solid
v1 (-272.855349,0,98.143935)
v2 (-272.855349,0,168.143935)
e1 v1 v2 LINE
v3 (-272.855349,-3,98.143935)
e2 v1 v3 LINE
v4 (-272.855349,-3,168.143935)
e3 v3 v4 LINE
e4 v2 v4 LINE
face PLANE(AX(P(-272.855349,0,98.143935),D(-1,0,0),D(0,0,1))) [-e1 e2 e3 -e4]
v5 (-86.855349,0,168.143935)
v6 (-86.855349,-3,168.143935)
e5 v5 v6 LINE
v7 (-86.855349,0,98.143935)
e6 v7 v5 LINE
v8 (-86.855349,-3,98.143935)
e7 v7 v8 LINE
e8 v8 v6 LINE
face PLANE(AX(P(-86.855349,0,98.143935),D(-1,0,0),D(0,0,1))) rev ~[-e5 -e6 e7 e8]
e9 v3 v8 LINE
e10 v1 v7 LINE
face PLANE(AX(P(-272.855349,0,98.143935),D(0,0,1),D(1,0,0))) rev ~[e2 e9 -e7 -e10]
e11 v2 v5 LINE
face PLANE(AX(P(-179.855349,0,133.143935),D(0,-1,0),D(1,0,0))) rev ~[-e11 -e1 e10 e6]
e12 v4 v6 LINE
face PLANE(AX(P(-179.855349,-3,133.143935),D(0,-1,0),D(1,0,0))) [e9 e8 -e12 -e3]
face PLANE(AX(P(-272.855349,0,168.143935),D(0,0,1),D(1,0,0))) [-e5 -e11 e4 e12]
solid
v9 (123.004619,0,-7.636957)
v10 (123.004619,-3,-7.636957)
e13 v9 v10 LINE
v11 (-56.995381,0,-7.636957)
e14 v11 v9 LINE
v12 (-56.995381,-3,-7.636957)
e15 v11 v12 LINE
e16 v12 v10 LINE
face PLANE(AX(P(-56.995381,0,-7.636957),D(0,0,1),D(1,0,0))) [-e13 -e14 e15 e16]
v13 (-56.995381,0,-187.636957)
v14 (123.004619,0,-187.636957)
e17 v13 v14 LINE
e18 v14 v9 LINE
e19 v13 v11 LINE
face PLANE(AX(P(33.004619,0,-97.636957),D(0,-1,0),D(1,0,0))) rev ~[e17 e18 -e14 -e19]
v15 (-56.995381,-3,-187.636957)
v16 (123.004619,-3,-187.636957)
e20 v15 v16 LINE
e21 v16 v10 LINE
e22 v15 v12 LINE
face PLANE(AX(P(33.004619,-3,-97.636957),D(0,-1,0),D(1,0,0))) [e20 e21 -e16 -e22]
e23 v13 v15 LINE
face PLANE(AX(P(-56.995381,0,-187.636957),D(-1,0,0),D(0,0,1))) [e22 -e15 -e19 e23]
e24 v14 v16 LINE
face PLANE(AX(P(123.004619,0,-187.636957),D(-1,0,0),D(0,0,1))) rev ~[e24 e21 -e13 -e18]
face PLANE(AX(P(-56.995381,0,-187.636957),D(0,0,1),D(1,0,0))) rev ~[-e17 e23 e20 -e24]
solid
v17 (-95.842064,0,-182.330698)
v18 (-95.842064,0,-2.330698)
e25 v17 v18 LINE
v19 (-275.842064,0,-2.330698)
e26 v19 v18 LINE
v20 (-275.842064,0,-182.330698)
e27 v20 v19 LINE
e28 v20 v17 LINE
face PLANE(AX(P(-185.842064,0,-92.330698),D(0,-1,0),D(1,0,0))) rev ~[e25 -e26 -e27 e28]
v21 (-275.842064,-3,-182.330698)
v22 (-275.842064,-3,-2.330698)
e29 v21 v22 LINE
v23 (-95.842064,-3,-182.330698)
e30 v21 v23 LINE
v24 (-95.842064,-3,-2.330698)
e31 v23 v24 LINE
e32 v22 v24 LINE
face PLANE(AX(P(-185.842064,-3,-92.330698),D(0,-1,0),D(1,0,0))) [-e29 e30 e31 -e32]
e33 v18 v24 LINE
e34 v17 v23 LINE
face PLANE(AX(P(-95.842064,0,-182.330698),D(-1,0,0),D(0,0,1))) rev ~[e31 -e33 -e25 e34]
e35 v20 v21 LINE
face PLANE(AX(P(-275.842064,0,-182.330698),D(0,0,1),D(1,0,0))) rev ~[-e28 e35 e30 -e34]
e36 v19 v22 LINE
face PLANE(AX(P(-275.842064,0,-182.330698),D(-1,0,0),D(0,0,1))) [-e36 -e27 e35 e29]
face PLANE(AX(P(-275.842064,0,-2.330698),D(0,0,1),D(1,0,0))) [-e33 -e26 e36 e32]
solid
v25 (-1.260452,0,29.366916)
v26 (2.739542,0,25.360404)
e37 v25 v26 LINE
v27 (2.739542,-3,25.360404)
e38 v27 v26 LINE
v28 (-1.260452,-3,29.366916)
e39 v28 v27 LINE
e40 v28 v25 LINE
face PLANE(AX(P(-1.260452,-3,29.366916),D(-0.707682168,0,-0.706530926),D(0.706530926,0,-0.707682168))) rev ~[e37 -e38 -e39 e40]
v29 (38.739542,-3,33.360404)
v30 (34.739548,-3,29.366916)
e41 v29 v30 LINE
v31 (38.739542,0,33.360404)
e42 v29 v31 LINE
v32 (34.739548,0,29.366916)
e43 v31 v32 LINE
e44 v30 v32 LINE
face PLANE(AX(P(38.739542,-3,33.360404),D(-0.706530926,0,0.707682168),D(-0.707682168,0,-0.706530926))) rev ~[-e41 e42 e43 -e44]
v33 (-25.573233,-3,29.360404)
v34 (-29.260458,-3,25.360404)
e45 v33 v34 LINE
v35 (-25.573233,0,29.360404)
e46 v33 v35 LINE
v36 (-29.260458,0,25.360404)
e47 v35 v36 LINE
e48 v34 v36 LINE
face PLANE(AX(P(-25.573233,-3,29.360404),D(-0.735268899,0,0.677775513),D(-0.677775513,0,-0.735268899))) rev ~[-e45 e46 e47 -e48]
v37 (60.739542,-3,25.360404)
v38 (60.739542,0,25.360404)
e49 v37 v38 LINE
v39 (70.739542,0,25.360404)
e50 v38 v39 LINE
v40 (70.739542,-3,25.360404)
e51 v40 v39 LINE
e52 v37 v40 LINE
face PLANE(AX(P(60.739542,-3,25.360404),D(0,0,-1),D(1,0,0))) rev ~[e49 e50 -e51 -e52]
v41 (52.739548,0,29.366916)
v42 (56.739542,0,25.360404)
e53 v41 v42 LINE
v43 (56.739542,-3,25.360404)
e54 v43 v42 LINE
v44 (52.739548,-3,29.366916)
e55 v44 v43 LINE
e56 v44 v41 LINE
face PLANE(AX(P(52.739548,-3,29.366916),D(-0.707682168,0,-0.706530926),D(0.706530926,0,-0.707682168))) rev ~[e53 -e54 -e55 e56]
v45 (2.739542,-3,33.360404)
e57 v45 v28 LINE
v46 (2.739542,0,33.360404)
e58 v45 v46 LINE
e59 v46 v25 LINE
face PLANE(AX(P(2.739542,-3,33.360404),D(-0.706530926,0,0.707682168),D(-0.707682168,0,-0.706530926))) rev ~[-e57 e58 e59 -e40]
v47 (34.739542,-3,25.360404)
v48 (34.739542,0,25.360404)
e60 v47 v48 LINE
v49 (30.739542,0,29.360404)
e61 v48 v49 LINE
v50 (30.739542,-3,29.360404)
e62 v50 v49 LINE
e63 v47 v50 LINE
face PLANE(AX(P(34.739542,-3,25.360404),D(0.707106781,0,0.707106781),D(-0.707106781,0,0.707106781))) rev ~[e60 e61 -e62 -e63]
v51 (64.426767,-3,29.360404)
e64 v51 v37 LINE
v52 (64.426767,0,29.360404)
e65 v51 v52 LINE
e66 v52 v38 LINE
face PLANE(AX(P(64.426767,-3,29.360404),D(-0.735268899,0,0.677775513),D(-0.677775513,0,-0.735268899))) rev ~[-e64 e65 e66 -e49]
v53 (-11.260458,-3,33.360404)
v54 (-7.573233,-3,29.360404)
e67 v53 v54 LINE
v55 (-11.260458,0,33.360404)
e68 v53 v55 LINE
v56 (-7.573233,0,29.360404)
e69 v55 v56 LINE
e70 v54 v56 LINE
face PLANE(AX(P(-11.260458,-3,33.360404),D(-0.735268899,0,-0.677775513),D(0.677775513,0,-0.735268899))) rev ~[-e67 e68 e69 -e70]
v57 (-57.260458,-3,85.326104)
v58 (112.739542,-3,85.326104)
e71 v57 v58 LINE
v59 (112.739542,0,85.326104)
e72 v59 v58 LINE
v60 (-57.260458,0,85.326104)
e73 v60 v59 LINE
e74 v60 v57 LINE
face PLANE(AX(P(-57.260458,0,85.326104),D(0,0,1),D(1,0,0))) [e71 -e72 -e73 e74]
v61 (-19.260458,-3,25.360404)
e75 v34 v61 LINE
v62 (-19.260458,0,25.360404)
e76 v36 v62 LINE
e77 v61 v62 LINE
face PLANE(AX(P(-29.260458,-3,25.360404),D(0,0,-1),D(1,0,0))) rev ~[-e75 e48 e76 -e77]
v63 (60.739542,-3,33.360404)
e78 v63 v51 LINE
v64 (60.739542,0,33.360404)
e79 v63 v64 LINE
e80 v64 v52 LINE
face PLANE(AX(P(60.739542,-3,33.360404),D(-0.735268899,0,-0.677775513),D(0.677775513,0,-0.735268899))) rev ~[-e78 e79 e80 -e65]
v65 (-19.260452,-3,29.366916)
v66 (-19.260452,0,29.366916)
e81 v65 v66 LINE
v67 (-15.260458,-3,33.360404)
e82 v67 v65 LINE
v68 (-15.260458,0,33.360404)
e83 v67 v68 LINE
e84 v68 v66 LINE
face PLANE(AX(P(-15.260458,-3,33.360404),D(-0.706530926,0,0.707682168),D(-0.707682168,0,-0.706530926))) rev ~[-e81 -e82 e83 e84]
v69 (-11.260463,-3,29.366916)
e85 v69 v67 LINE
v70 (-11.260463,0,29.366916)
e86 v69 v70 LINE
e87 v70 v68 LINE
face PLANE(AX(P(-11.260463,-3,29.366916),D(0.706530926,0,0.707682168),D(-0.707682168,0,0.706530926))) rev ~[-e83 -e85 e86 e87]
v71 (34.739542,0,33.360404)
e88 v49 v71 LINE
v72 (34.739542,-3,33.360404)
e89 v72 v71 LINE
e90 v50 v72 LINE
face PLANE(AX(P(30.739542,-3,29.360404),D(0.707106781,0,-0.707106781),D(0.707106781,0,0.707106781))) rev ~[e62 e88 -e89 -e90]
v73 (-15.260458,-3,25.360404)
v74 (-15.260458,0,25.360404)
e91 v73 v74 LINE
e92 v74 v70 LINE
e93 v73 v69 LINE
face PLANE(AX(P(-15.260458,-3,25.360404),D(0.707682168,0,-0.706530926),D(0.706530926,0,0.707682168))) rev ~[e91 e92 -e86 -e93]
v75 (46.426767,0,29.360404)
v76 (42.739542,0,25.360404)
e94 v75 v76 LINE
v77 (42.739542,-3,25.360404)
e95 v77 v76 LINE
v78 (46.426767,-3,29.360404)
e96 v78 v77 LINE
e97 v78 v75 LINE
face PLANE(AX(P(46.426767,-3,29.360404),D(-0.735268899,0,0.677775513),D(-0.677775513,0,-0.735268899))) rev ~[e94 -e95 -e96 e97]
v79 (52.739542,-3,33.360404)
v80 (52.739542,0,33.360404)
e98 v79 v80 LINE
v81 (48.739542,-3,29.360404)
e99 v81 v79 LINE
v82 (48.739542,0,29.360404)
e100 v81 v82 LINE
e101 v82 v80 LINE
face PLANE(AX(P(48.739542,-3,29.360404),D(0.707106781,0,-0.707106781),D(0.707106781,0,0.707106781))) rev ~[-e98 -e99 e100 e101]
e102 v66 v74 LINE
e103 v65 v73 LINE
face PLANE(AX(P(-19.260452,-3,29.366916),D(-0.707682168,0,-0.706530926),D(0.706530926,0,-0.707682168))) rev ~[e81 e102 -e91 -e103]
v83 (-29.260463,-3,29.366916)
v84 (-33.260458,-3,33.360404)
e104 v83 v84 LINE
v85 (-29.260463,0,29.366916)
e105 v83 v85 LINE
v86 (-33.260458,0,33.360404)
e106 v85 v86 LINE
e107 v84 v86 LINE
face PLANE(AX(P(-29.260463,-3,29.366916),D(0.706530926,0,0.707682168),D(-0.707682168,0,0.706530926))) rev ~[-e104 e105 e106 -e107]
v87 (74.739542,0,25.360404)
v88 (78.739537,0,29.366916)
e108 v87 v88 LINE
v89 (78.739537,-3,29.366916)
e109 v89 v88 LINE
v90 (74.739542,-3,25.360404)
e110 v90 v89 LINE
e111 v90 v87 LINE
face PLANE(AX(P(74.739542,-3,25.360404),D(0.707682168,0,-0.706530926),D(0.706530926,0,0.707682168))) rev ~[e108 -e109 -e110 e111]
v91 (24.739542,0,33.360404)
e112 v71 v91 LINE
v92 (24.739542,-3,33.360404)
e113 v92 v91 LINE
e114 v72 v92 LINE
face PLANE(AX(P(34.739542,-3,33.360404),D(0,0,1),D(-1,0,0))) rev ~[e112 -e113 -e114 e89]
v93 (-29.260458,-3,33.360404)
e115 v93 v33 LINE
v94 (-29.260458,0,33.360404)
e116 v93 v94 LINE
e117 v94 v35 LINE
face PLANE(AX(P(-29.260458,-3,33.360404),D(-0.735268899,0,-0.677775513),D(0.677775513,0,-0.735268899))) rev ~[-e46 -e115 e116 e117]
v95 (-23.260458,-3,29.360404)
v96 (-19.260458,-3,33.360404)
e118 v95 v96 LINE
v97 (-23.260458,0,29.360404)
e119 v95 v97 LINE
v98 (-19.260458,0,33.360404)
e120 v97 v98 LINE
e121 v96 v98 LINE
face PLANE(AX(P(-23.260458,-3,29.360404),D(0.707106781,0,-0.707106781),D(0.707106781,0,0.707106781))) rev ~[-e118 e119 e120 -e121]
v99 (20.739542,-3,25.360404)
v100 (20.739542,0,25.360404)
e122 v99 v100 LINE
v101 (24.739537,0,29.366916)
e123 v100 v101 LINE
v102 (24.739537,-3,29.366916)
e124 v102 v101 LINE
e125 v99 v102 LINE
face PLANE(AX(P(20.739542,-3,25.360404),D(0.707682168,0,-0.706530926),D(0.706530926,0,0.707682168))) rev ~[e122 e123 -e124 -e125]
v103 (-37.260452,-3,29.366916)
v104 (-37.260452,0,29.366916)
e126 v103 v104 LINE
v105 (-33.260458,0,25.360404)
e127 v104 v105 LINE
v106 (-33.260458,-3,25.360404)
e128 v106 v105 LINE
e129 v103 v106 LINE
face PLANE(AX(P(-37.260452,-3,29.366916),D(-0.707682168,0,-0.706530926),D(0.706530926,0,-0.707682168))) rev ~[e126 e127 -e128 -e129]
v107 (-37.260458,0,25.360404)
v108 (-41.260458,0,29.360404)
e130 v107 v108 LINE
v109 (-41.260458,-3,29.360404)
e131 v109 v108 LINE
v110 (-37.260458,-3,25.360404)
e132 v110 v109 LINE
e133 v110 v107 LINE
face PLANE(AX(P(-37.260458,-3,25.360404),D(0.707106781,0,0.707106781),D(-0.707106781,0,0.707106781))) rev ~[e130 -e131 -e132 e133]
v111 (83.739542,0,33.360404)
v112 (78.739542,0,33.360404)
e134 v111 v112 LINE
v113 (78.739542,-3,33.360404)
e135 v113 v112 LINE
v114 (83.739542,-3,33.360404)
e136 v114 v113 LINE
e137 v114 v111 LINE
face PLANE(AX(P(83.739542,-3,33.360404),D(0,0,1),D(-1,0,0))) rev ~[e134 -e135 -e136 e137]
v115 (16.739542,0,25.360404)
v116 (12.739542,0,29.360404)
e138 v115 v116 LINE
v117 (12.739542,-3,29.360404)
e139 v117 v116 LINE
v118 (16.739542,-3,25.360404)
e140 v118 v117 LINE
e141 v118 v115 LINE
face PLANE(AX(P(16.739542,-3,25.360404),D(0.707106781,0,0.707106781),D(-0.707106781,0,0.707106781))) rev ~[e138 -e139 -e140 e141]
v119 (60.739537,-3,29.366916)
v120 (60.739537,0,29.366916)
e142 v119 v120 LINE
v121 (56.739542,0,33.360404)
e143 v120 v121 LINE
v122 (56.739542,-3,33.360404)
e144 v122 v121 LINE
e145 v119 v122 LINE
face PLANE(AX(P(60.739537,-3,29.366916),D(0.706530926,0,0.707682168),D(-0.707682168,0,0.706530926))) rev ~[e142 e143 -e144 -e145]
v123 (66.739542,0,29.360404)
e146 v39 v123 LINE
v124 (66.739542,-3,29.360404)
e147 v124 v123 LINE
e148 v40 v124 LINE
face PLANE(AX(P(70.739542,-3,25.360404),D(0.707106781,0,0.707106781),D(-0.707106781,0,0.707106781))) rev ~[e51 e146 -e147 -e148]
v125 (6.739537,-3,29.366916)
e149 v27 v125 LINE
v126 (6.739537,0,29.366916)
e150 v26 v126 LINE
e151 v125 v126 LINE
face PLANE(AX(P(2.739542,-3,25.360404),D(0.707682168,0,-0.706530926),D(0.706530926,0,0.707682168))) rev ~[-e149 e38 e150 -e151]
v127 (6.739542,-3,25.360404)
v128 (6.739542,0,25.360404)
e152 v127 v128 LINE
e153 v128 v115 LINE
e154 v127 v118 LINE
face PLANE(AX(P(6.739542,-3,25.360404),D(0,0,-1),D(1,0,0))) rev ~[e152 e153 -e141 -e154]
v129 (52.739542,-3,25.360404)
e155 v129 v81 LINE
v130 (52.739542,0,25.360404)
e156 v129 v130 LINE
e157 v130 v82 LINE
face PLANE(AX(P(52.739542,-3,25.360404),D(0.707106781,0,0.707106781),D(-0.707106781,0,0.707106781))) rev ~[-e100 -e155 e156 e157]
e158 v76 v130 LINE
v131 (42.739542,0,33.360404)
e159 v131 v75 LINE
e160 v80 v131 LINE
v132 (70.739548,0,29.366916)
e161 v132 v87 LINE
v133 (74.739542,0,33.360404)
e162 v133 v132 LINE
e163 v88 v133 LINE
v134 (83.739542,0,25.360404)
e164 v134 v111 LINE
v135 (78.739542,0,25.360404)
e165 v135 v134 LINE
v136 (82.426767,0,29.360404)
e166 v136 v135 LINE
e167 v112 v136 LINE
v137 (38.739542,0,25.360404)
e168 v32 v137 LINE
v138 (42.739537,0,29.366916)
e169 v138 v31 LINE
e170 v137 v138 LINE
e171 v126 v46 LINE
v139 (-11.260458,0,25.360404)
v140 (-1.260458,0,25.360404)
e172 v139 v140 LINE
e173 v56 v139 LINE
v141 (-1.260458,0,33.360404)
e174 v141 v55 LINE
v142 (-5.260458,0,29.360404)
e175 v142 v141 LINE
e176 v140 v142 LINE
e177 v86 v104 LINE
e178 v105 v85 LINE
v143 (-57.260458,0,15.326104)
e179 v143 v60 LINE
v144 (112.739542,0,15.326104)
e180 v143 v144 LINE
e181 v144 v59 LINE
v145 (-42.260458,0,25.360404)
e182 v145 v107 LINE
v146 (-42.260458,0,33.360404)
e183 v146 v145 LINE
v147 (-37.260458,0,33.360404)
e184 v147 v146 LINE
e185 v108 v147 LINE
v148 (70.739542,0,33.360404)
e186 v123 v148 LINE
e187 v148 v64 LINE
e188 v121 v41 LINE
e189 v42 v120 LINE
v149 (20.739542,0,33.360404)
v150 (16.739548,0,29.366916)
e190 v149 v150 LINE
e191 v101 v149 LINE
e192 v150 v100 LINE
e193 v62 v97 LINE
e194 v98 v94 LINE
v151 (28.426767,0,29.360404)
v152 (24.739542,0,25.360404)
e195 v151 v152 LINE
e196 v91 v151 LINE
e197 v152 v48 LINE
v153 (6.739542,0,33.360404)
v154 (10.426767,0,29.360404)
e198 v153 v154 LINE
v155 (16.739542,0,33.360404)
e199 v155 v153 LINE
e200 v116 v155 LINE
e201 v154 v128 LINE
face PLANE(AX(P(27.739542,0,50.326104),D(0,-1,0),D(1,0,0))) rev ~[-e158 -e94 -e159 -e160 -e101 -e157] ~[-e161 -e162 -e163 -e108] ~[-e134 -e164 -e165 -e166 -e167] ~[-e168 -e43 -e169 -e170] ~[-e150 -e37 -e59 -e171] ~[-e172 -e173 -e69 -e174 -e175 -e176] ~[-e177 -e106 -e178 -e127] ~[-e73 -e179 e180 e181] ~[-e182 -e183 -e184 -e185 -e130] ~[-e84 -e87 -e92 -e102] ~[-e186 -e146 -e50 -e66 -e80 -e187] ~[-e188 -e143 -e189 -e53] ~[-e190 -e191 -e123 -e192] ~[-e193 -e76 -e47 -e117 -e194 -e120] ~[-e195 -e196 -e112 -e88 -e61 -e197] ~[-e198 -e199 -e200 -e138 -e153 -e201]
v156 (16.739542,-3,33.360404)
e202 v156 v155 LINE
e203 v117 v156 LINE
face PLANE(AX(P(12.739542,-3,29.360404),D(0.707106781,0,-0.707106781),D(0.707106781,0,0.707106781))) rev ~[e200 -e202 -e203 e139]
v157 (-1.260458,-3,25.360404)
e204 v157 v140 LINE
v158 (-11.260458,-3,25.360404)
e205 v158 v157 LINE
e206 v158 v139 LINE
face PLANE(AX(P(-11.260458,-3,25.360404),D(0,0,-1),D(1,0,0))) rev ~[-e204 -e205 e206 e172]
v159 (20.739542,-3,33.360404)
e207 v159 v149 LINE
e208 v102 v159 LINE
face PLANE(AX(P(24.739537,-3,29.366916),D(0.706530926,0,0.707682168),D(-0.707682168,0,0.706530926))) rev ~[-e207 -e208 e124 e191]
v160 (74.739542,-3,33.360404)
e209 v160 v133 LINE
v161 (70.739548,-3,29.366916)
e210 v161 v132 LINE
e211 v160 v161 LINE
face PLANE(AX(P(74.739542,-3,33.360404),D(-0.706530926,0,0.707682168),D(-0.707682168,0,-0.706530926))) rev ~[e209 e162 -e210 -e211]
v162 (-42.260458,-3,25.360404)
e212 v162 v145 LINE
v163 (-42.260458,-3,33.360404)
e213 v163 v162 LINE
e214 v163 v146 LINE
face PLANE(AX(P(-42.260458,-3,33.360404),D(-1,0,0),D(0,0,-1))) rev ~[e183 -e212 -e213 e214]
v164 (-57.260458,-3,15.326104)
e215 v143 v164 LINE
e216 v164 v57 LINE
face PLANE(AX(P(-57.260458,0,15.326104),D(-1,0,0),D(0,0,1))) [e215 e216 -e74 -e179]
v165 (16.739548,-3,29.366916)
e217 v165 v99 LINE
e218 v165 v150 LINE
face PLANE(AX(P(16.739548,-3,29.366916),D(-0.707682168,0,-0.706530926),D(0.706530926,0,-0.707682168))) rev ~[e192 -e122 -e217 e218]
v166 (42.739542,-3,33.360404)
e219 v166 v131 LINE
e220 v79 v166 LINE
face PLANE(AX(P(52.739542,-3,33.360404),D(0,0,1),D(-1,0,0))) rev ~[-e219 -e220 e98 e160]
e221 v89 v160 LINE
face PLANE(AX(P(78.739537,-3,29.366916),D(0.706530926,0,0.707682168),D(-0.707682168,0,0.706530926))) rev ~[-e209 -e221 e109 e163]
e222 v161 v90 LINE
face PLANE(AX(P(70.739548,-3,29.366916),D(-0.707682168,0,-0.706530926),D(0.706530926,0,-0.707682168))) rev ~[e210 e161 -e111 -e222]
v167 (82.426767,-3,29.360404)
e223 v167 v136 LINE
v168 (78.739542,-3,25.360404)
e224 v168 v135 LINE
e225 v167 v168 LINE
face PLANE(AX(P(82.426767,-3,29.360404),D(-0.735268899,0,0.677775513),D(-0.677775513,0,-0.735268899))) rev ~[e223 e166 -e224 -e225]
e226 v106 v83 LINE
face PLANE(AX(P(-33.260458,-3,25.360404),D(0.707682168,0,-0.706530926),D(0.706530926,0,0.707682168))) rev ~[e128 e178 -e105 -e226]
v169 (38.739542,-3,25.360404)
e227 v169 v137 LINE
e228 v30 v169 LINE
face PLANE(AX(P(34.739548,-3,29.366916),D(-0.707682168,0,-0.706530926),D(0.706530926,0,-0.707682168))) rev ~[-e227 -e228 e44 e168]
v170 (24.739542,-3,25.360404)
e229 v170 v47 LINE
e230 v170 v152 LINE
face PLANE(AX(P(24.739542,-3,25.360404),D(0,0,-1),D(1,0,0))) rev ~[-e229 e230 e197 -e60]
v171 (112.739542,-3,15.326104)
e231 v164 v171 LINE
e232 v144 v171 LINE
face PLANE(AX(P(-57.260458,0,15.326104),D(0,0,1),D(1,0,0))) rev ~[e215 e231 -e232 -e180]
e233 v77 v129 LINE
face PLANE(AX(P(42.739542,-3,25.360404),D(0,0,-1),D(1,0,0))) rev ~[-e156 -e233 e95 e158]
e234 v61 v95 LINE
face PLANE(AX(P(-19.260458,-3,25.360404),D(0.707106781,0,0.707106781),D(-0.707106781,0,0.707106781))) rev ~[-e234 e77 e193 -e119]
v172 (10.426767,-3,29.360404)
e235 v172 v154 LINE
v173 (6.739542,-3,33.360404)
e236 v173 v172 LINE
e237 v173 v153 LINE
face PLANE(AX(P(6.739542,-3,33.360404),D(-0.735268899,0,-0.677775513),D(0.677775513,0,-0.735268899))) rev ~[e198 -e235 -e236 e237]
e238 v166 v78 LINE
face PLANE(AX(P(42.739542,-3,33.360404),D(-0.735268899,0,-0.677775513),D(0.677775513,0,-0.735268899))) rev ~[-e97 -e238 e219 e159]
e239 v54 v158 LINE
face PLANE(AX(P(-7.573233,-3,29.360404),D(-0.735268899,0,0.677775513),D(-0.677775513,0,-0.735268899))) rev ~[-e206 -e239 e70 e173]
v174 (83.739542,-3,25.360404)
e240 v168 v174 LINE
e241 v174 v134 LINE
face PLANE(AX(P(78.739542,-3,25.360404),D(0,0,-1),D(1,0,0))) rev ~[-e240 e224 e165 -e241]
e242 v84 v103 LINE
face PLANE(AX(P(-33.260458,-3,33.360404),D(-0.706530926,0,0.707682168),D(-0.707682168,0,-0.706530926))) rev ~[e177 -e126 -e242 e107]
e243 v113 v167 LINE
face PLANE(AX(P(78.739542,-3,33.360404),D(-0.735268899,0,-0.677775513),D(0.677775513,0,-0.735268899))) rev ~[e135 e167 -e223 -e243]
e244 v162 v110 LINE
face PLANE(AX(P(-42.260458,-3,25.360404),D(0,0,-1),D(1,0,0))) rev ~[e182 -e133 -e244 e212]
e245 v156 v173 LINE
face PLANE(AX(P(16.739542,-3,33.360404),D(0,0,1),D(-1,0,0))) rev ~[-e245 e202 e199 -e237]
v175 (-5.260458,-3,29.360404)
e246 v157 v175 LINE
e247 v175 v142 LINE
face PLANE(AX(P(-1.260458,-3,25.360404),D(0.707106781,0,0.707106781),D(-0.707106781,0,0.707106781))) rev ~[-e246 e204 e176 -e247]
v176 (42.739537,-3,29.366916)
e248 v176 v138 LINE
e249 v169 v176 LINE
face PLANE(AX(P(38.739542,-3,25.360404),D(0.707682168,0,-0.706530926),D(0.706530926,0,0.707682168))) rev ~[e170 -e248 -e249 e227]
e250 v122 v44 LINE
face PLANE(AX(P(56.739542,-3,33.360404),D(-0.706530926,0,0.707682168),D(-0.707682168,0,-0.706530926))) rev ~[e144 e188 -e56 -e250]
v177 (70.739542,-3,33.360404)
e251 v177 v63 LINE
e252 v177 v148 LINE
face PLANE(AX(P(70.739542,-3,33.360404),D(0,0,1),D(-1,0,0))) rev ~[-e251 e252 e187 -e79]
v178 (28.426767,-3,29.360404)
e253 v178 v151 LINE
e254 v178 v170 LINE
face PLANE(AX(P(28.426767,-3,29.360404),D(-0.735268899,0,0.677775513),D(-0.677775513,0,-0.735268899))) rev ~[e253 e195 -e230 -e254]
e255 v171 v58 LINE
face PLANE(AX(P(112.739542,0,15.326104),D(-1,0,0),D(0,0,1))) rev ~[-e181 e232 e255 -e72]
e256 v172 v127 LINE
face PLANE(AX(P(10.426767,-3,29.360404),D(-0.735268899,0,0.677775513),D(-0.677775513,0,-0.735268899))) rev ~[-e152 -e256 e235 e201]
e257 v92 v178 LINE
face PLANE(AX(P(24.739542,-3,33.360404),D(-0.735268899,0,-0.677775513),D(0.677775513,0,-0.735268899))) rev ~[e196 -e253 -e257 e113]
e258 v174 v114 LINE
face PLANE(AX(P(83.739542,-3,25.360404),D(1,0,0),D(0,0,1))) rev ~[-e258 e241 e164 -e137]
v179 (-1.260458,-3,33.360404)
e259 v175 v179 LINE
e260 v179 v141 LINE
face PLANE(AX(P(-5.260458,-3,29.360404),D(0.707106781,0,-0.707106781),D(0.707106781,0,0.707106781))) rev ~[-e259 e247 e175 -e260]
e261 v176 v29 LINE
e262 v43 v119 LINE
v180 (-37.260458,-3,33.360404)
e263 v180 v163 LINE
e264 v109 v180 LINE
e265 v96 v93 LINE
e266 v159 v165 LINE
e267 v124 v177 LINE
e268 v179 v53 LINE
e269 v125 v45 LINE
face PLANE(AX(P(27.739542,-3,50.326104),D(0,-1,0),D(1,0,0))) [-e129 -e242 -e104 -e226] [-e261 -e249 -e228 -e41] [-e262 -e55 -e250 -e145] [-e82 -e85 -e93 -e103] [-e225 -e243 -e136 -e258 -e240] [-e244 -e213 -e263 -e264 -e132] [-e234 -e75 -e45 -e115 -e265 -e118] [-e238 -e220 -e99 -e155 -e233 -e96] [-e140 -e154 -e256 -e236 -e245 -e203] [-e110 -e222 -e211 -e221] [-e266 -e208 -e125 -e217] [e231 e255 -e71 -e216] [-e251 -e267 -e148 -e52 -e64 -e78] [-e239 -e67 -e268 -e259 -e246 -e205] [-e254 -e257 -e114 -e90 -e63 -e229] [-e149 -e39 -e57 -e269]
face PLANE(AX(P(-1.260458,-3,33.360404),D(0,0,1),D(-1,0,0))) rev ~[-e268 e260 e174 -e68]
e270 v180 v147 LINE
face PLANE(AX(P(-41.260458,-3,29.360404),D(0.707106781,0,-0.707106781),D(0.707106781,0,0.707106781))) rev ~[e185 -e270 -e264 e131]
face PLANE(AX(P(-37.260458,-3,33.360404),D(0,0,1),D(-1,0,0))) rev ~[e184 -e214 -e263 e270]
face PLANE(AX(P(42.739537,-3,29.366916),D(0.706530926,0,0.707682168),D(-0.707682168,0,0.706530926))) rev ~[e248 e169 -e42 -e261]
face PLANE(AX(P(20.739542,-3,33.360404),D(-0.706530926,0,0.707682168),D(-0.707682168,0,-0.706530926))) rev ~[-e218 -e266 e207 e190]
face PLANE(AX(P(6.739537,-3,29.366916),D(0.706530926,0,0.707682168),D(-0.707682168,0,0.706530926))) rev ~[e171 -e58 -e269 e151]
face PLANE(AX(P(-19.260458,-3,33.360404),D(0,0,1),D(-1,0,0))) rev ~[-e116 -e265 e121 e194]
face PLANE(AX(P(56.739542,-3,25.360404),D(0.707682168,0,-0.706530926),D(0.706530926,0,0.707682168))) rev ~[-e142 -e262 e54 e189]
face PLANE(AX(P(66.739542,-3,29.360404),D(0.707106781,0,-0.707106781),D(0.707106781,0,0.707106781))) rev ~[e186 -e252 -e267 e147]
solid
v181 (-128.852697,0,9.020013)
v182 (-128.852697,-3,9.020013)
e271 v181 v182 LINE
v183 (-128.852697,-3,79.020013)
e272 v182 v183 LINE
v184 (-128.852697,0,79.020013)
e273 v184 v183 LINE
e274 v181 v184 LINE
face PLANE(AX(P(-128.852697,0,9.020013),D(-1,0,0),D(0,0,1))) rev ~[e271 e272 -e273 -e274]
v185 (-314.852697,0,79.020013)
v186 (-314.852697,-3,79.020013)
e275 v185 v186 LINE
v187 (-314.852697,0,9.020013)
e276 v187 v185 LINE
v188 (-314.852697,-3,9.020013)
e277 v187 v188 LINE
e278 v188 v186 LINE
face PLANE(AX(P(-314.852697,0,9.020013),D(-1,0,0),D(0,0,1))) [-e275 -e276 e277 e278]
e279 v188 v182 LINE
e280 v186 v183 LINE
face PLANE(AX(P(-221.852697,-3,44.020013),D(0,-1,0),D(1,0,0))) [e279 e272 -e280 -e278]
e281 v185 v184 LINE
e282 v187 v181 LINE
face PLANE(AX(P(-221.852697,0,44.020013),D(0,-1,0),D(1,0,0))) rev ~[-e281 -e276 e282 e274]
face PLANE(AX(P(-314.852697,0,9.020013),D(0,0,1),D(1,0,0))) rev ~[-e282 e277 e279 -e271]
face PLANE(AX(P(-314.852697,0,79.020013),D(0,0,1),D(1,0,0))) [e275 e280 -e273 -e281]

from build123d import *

# Parameters (mm, degrees)
F0_W      = 170
F0_H      = 70
F1_DEPTH  = 3
F3_DEPTH  = 25
F4_W      = 186
F4_H      = 70
F5_DEPTH  = 3
F6_W      = 180
F6_H      = 180
F7_DEPTH  = 3
F8_W      = 186
F8_H      = 70
F9_DEPTH  = 3
F10_W     = 180
F10_H     = 180
F11_DEPTH = 3


# Not quite as in the source:
# - a feature names something its author has since deleted; it is built from what else it names


with BuildPart() as f1:
    # F0 (on Front) → F1 (new body)
    with BuildSketch(Plane.XZ):
        with Locations((27.7395422168, 50.3261041269)):
            Rectangle(F0_W, F0_H)
    extrude(amount=F1_DEPTH)

    # F2 (on face) → F3 (cut)
    with BuildSketch(Plane.XZ.offset(3)):
        Polygon((-42.2604577832, 33.3604037393), (-42.2604577832, 25.3604037393), (-37.2604577832, 25.3604037393), (-41.2604577832, 29.3604037393), (-37.2604577832, 33.3604037393), align=None)
        Polygon((-37.2604524818, 29.366916148), (-33.2604577832, 25.3604037393), (-29.2604630847, 29.366916148), (-33.2604577832, 33.3604037393), align=None)
        Polygon((-25.5732325301, 29.3604037393), (-29.2604577832, 25.3604037393), (-24.2604577832, 25.3604037393), (-24.2604577832, 33.3604037393), (-29.2604577832, 33.3604037393), align=None)
        Polygon((-24.2604577832, 33.3604037393), (-24.2604577832, 25.3604037393), (-19.2604577832, 25.3604037393), (-23.2604577832, 29.3604037393), (-19.2604577832, 33.3604037393), align=None)
        Polygon((-11.2604630847, 29.366916148), (-15.2604577832, 33.3604037393), (-19.2604524818, 29.366916148), (-15.2604577832, 25.3604037393), align=None)
        Polygon((-7.5732325301, 29.3604037393), (-11.2604577832, 25.3604037393), (-6.2604577832, 25.3604037393), (-6.2604577832, 33.3604037393), (-11.2604577832, 33.3604037393), align=None)
        Polygon((-6.2604577832, 33.3604037393), (-6.2604577832, 25.3604037393), (-1.2604577832, 25.3604037393), (-5.2604577832, 29.3604037393), (-1.2604577832, 33.3604037393), align=None)
        Polygon((6.7395369153, 29.366916148), (2.7395422168, 33.3604037393), (-1.2604524818, 29.366916148), (2.7395422168, 25.3604037393), align=None)
        Polygon((10.4267674699, 29.3604037393), (6.7395422168, 25.3604037393), (11.7395422168, 25.3604037393), (11.7395422168, 33.3604037393), (6.7395422168, 33.3604037393), align=None)
        Polygon((11.7395422168, 33.3604037393), (11.7395422168, 25.3604037393), (16.7395422168, 25.3604037393), (12.7395422168, 29.3604037393), (16.7395422168, 33.3604037393), align=None)
        Polygon((24.7395369153, 29.366916148), (20.7395422168, 33.3604037393), (16.7395475182, 29.366916148), (20.7395422168, 25.3604037393), align=None)
        Polygon((28.4267674699, 29.3604037393), (24.7395422168, 25.3604037393), (29.7395422168, 25.3604037393), (29.7395422168, 33.3604037393), (24.7395422168, 33.3604037393), align=None)
        Polygon((29.7395422168, 33.3604037393), (29.7395422168, 25.3604037393), (34.7395422168, 25.3604037393), (30.7395422168, 29.3604037393), (34.7395422168, 33.3604037393), align=None)
        Polygon((42.7395369153, 29.366916148), (38.7395422168, 33.3604037393), (34.7395475182, 29.366916148), (38.7395422168, 25.3604037393), align=None)
        Polygon((46.4267674699, 29.3604037393), (42.7395422168, 25.3604037393), (47.7395422168, 25.3604037393), (47.7395422168, 33.3604037393), (42.7395422168, 33.3604037393), align=None)
        Polygon((47.7395422168, 33.3604037393), (47.7395422168, 25.3604037393), (52.7395422168, 25.3604037393), (48.7395422168, 29.3604037393), (52.7395422168, 33.3604037393), align=None)
        Polygon((60.7395369153, 29.366916148), (56.7395422168, 33.3604037393), (52.7395475182, 29.366916148), (56.7395422168, 25.3604037393), align=None)
        Polygon((64.4267674699, 29.3604037393), (60.7395422168, 25.3604037393), (65.7395422168, 25.3604037393), (65.7395422168, 33.3604037393), (60.7395422168, 33.3604037393), align=None)
        Polygon((65.7395422168, 33.3604037393), (65.7395422168, 25.3604037393), (70.7395422168, 25.3604037393), (66.7395422168, 29.3604037393), (70.7395422168, 33.3604037393), align=None)
        Polygon((78.7395369153, 29.366916148), (74.7395422168, 33.3604037393), (70.7395475182, 29.366916148), (74.7395422168, 25.3604037393), align=None)
        Polygon((82.4267674699, 29.3604037393), (78.7395422168, 25.3604037393), (83.7395422168, 25.3604037393), (83.7395422168, 33.3604037393), (78.7395422168, 33.3604037393), align=None)
    extrude(amount=-F3_DEPTH, mode=Mode.SUBTRACT)


with BuildPart() as f5:
    # F4 (on Front) → F5 (new body)
    with BuildSketch(Plane.XZ):
        with Locations((-221.8526970997, 44.0200128766)):
            Rectangle(F4_W, F4_H)
    extrude(amount=F5_DEPTH)


with BuildPart() as f7:
    # F6 (on Front) → F7 (new body)
    with BuildSketch(Plane.XZ):
        with Locations((33.0046193302, -97.6369565725)):
            Rectangle(F6_W, F6_H)
    extrude(amount=F7_DEPTH)


with BuildPart() as f9:
    # F8 (on Front) → F9 (new body)
    with BuildSketch(Plane.XZ):
        with Locations((-179.8553494937, 133.1439353526)):
            Rectangle(F8_W, F8_H)
    extrude(amount=F9_DEPTH)


with BuildPart() as f11:
    # F10 (on Front) → F11 (new body)
    with BuildSketch(Plane.XZ):
        with Locations((-185.8420636411, -92.3306977749)):
            Rectangle(F10_W, F10_H)
    extrude(amount=F11_DEPTH)


solid = Compound([f1.part, f5.part, f7.part, f9.part, f11.part])
